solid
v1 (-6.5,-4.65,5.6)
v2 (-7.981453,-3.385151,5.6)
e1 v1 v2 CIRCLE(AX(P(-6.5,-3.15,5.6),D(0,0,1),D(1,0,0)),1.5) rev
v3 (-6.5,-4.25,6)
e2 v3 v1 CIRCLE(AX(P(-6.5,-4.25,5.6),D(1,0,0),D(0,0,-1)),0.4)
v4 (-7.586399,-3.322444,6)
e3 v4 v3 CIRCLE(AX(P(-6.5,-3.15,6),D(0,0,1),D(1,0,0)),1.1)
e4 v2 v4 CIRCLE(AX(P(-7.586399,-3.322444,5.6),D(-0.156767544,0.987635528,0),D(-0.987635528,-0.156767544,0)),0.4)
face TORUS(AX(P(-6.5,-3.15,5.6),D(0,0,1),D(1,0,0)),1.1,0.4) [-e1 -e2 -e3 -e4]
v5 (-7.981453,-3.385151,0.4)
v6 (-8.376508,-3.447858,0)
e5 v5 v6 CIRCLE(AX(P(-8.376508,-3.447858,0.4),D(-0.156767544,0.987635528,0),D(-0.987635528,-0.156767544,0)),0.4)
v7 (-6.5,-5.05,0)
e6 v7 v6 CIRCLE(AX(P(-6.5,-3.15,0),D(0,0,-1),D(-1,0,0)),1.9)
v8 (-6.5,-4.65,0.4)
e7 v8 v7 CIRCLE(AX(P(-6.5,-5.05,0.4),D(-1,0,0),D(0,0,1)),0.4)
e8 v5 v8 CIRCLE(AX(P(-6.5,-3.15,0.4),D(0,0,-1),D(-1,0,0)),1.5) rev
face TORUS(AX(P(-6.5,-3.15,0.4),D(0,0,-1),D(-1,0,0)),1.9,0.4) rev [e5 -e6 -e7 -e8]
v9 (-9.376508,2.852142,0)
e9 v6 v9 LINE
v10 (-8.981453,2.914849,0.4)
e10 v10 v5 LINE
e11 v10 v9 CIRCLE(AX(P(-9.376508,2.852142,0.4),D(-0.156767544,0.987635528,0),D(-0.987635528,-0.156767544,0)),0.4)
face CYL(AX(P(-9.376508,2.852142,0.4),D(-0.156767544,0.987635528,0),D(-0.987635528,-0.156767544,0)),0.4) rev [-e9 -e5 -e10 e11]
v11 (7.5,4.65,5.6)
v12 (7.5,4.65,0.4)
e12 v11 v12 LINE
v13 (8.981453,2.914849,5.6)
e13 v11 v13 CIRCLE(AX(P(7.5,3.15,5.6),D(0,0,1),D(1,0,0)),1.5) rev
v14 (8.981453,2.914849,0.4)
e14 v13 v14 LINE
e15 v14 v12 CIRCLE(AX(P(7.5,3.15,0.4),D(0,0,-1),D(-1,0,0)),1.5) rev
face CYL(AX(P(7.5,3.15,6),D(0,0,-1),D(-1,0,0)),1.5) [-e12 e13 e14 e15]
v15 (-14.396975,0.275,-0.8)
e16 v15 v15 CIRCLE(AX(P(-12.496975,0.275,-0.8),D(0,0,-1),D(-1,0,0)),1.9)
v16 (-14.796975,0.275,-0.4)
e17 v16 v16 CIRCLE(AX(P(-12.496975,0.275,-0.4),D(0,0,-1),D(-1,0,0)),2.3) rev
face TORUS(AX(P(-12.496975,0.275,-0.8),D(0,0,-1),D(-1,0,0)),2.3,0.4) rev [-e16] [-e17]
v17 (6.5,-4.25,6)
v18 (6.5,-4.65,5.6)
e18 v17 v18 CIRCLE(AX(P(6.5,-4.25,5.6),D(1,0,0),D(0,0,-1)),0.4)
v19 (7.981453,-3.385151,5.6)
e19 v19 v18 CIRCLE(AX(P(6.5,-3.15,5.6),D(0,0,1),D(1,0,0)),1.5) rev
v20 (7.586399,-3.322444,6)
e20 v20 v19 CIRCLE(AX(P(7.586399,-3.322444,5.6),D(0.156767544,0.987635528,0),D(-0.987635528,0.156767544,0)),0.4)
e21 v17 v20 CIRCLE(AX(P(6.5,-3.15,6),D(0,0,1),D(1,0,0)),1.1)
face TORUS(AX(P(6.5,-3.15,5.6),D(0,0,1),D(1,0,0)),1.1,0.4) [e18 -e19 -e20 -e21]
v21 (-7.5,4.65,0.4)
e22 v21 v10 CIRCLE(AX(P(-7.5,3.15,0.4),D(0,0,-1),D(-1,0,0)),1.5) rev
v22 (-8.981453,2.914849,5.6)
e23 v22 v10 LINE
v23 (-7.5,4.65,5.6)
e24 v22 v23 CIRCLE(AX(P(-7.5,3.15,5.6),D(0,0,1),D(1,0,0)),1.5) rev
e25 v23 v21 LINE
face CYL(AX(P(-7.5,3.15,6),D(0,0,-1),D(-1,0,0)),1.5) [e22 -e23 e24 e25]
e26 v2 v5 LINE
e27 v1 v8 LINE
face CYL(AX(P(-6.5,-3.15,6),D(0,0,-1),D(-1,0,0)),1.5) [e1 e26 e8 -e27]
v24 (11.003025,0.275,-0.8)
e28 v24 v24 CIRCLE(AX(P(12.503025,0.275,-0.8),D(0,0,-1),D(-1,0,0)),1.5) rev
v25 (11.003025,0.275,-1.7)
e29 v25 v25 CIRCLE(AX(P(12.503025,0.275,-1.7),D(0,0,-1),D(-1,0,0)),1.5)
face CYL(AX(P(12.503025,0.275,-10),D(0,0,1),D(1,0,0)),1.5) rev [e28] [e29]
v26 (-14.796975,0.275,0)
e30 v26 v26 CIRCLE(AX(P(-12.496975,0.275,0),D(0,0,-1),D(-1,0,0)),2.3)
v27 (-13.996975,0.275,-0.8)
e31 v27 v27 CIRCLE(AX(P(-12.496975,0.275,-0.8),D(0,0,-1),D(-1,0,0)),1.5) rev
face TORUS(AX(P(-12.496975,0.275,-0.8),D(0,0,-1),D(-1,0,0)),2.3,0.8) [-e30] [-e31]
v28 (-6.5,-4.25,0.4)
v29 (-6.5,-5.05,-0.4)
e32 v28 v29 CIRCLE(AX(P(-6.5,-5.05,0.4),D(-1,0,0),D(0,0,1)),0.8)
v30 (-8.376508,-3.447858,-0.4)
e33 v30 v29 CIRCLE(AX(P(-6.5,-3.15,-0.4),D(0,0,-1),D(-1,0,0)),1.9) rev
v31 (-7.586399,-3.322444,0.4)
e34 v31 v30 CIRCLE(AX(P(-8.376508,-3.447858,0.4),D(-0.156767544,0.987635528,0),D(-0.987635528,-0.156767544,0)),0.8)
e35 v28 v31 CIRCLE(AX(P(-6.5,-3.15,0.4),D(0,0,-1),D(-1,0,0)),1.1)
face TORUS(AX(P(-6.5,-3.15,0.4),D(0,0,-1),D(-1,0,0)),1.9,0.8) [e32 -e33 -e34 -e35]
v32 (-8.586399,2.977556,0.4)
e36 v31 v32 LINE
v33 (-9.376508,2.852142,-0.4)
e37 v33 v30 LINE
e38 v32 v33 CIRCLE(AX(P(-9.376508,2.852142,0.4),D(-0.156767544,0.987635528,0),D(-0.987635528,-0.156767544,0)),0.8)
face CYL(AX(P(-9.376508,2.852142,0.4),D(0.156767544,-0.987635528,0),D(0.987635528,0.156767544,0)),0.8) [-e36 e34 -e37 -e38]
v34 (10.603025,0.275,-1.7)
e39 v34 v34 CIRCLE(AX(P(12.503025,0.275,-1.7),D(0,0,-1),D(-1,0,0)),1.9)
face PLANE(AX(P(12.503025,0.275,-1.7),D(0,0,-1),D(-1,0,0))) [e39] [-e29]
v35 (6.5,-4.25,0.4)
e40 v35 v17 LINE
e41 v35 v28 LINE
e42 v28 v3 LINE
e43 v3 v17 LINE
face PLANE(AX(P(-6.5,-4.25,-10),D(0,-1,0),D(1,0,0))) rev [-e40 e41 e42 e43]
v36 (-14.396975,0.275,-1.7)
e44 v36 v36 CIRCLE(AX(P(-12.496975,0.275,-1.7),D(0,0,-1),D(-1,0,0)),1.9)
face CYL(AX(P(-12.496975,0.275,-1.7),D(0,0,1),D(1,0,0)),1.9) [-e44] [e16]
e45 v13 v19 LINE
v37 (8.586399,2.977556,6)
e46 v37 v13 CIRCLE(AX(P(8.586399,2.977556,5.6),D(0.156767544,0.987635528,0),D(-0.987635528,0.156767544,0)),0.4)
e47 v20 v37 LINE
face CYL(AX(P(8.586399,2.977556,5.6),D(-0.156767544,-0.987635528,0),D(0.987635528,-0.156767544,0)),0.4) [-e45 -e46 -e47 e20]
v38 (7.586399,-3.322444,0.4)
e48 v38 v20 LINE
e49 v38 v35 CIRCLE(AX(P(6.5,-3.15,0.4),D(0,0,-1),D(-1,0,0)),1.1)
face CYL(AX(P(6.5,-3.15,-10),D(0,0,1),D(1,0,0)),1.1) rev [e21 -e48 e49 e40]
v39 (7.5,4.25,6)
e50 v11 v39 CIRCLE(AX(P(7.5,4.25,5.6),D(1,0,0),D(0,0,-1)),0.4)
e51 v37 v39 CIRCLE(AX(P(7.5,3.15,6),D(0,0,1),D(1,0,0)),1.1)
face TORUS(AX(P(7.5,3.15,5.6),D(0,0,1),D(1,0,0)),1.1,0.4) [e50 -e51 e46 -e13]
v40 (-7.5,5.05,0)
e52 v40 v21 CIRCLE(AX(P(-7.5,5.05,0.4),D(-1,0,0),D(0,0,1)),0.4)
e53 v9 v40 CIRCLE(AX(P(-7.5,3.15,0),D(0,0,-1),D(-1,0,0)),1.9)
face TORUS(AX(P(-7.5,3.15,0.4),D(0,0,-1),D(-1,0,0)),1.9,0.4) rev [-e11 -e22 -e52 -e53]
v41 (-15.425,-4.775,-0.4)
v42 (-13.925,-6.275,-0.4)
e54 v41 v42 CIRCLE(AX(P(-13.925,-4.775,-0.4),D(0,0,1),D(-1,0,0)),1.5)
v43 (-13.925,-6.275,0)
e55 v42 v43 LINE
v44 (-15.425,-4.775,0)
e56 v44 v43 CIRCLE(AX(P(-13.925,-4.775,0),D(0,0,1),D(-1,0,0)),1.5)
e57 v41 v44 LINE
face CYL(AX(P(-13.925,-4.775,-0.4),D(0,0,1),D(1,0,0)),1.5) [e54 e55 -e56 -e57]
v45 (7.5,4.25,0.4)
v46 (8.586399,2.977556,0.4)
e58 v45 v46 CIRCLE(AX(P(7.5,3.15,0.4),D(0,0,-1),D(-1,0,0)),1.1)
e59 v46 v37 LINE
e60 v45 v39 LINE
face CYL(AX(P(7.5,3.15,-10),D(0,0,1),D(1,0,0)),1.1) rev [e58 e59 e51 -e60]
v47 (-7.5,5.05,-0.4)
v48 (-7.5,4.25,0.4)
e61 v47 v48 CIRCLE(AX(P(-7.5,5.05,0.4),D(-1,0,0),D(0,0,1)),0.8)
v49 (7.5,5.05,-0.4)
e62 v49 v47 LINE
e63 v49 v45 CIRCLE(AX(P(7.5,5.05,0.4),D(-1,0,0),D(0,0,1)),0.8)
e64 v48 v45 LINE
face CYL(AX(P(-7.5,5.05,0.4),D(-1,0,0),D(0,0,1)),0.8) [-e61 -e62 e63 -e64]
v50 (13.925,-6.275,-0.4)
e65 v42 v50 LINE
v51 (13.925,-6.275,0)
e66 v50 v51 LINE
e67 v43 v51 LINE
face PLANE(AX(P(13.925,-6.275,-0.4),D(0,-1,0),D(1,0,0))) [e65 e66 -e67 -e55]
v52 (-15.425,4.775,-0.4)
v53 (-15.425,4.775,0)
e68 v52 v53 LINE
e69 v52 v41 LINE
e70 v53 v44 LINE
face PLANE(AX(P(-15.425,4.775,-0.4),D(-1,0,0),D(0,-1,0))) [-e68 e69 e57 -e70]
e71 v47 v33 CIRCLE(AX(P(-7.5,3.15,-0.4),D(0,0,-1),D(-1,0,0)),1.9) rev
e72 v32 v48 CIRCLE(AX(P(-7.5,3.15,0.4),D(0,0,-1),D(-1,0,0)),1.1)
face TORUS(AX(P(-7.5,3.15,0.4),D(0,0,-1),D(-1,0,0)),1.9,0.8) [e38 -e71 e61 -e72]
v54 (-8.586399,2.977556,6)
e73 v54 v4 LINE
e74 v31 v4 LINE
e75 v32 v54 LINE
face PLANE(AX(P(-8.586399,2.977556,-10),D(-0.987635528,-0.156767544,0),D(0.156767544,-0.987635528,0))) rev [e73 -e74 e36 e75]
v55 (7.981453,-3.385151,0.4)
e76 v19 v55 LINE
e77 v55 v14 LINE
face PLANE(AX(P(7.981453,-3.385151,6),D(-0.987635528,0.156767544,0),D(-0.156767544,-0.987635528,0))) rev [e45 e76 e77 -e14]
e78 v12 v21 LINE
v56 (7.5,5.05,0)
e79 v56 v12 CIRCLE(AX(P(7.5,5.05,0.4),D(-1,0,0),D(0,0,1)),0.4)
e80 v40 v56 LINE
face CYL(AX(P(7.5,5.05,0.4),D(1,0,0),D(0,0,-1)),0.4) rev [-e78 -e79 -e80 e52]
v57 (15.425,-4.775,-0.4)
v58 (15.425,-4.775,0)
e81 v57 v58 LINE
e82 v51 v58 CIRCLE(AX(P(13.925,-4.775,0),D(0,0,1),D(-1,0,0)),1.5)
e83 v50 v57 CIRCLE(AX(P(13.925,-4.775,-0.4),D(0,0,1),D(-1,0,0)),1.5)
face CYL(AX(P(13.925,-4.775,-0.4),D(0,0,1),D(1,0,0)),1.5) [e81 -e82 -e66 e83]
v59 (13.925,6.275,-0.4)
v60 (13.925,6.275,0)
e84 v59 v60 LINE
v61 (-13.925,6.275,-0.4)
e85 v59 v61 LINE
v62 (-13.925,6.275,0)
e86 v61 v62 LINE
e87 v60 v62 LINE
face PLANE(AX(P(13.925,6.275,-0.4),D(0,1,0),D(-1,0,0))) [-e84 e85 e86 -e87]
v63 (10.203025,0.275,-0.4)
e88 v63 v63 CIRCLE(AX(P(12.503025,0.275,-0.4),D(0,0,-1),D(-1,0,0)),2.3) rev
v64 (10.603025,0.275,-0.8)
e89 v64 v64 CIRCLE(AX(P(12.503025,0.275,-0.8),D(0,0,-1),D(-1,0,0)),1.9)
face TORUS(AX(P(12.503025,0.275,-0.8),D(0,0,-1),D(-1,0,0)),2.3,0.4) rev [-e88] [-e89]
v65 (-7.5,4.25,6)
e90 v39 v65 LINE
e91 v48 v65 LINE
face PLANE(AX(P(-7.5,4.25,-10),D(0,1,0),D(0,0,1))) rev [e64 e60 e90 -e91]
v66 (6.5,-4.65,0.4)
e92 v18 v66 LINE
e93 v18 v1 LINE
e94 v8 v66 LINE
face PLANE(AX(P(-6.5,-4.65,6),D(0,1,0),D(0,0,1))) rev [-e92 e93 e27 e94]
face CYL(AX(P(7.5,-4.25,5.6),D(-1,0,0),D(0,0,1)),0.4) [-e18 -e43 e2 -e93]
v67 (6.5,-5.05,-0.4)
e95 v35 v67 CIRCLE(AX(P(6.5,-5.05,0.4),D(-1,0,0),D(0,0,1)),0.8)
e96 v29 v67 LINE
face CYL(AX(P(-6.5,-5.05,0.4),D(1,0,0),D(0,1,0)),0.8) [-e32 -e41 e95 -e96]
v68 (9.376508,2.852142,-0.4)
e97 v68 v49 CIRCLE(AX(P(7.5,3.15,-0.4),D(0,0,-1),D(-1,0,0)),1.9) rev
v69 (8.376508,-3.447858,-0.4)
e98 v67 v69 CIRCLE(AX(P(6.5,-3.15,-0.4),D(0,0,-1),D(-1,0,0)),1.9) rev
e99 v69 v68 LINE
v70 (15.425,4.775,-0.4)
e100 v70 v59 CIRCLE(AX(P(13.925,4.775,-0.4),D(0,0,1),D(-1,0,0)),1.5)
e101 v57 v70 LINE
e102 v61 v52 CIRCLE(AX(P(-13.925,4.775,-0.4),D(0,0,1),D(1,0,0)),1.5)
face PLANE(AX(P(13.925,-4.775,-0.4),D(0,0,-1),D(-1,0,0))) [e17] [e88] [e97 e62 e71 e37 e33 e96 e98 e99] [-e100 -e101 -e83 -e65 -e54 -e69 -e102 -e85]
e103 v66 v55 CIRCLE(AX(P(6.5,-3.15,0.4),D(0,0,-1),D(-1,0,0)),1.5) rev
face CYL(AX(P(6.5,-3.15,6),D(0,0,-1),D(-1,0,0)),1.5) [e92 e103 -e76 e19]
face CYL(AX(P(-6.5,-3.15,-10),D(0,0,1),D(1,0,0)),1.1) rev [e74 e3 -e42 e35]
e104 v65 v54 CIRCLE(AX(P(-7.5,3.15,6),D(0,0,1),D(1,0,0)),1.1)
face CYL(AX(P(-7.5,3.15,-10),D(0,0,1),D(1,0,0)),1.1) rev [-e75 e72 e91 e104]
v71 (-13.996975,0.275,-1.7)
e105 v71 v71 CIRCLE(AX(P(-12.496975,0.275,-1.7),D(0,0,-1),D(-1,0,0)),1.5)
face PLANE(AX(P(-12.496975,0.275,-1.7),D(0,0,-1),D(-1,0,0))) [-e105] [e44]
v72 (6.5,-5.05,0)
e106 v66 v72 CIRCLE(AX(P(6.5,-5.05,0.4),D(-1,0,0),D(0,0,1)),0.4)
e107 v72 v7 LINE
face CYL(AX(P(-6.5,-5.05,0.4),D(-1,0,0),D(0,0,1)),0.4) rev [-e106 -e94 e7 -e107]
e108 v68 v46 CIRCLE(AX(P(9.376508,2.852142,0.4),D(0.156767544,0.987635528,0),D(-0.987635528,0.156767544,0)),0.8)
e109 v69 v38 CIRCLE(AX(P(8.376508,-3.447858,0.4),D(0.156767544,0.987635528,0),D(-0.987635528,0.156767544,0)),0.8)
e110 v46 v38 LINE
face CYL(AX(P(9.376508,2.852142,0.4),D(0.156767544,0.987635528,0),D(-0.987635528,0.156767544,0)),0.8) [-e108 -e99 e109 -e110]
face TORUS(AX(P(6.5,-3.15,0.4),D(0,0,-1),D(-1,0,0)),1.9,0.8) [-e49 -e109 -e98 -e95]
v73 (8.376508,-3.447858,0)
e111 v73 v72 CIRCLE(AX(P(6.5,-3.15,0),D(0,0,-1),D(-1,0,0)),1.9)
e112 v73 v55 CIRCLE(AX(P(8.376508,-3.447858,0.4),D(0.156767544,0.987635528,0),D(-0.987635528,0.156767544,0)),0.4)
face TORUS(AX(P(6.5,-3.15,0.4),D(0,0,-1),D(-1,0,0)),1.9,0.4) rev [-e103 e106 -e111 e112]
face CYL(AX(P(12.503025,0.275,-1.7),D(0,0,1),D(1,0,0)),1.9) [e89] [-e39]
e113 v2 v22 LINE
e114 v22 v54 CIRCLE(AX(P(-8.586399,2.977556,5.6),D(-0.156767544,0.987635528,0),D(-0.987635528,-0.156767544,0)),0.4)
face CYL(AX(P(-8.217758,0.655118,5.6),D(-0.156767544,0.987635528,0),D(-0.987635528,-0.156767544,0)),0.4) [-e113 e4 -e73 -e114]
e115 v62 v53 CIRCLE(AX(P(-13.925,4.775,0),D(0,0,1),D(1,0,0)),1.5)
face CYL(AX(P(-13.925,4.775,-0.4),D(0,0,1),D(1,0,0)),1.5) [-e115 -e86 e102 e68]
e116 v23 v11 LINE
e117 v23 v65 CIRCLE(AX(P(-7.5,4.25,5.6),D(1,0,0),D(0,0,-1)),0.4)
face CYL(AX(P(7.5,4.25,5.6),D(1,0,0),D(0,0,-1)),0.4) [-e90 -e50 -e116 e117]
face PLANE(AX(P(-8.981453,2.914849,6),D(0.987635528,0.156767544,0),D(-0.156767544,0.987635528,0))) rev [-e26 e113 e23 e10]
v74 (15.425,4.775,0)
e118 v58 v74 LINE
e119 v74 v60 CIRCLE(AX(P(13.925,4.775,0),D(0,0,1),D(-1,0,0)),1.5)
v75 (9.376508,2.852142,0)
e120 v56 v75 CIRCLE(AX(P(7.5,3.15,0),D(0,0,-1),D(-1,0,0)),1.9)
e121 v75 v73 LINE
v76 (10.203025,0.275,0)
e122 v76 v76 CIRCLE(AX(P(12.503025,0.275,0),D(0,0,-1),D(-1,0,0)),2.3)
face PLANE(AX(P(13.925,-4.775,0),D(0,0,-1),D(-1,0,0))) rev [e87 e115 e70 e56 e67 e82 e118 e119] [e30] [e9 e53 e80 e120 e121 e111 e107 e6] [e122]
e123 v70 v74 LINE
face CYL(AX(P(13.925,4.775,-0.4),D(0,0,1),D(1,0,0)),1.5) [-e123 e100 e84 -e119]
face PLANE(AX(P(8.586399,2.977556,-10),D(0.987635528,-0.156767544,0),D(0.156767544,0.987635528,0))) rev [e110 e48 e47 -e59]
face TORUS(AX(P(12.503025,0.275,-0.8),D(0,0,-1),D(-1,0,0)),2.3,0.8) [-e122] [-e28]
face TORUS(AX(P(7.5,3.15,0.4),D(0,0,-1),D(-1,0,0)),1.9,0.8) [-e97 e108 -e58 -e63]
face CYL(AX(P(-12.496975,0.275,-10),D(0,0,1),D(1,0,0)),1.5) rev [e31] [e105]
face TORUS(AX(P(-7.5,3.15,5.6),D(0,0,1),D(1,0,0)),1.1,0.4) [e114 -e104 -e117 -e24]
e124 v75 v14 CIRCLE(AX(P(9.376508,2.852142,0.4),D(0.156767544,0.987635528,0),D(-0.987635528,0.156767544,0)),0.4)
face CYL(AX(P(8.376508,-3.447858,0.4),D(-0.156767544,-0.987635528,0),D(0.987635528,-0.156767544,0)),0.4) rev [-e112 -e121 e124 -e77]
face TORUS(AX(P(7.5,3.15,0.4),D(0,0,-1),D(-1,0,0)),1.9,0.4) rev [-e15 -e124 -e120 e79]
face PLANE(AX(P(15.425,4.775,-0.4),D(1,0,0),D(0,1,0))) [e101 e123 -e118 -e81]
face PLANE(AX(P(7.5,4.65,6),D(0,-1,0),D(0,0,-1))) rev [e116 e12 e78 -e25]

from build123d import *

# Parameters (mm, degrees)
BASE_FLANGE1_DEPTH  = 0.4
SKETCH6_R           = 1.5
CUT_EXTRUDE1_DEPTH  = 10
CUT_EXTRUDE2_DEPTH  = 10
BOSS_EXTRUDE1_START = 6
BOSS_EXTRUDE1_DEPTH = 6
FILLET1_R           = 0.4
FILLET2_R           = 0.8
SKETCH10_R          = 1.9
SKETCH10_R_2        = 1.5
BOSS_EXTRUDE2_DEPTH = 1.3
FILLET3_R           = 0.4
FILLET4_R           = 0.8
FILLET5_R           = 0.4


# Sheet-metal steps are written as plain solids
with BuildPart() as part:
    # Sketch1 → Base-Flange1 (new body)
    with BuildSketch(Plane.XY):
        with BuildLine():
            Line((13.925, 6.275), (-13.925, 6.275))
            ThreePointArc((-13.925, 6.275), (-14.985660172, 5.835660172), (-15.425, 4.775))
            Line((-15.425, 4.775), (-15.425, -4.775))
            ThreePointArc((-15.425, -4.775), (-14.985660172, -5.835660172), (-13.925, -6.275))
            Line((-13.925, -6.275), (13.925, -6.275))
            ThreePointArc((13.925, -6.275), (14.985660172, -5.835660172), (15.425, -4.775))
            Line((15.425, -4.775), (15.425, 4.775))
            ThreePointArc((15.425, 4.775), (14.985660172, 5.835660172), (13.925, 6.275))
        make_face()
    extrude(amount=-BASE_FLANGE1_DEPTH)

    # Sketch6 → Cut-Extrude1 (cut)
    with BuildSketch(Plane.XY):
        with Locations((-12.496974634, 0.275)):
            Circle(SKETCH6_R)
        with Locations((12.503025366, 0.275)):
            Circle(SKETCH6_R)
    extrude(amount=-CUT_EXTRUDE1_DEPTH, mode=Mode.SUBTRACT)

    # Sketch7 → Cut-Extrude2 (cut)
    with BuildSketch(Plane.XY):
        with BuildLine():
            Line((8.586399081, 2.977555701), (7.586399081, -3.322444299))
            ThreePointArc((7.586399081, -3.322444299), (7.214251801, -3.986567011), (6.5, -4.25))
            Line((6.5, -4.25), (-6.5, -4.25))
            ThreePointArc((-6.5, -4.25), (-7.214251801, -3.986567011), (-7.586399081, -3.322444299))
            Line((-7.586399081, -3.322444299), (-8.586399081, 2.977555701))
            ThreePointArc((-8.586399081, 2.977555701), (-8.336567011, 3.864251801), (-7.5, 4.25))
            Line((-7.5, 4.25), (7.5, 4.25))
            ThreePointArc((7.5, 4.25), (8.336567011, 3.864251801), (8.586399081, 2.977555701))
        make_face()
    extrude(amount=-CUT_EXTRUDE2_DEPTH, mode=Mode.SUBTRACT)

    # Sketch8 → Boss-Extrude1 (add)
    with BuildSketch(Plane.XY.offset(BOSS_EXTRUDE1_START)):
        with BuildLine():
            Line((7.5, 4.65), (-7.5, 4.65))
            ThreePointArc((-7.5, 4.65), (-8.640773197, 4.123979729), (-8.981453293, 2.914848684))
            Line((-8.981453293, 2.914848684), (-7.981453293, -3.385151316))
            ThreePointArc((-7.981453293, -3.385151316), (-7.473979729, -4.290773197), (-6.5, -4.65))
            Line((-6.5, -4.65), (6.5, -4.65))
            ThreePointArc((6.5, -4.65), (7.473979729, -4.290773197), (7.981453293, -3.385151316))
            Line((7.981453293, -3.385151316), (8.981453293, 2.914848684))
            ThreePointArc((8.981453293, 2.914848684), (8.640773197, 4.123979729), (7.5, 4.65))
        make_face()
        with BuildLine():
            Line((7.586399081, -3.322444299), (8.586399081, 2.977555701))
            ThreePointArc((8.586399081, 2.977555701), (8.336567011, 3.864251801), (7.5, 4.25))
            Line((7.5, 4.25), (-7.5, 4.25))
            ThreePointArc((-7.5, 4.25), (-8.336567011, 3.864251801), (-8.586399081, 2.977555701))
            Line((-8.586399081, 2.977555701), (-7.586399081, -3.322444299))
            ThreePointArc((-7.586399081, -3.322444299), (-7.214251801, -3.986567011), (-6.5, -4.25))
            Line((-6.5, -4.25), (6.5, -4.25))
            ThreePointArc((6.5, -4.25), (7.214251801, -3.986567011), (7.586399081, -3.322444299))
        make_face(mode=Mode.SUBTRACT)
    extrude(amount=-BOSS_EXTRUDE1_DEPTH)

    # Fillet1
    fillet1_edges = [part.edges().sort_by_distance(p)[0] for p in [
        (-7.473979729, -4.290773197, 0),
        (0, -4.65, 0),
        (7.473979729, -4.290773197, 0),
        (8.481453293, -0.235151316, 0),
        (8.640773197, 4.123979729, 0),
        (0, 4.65, 0),
        (-8.640773197, 4.123979729, 0),
        (-8.481453293, -0.235151316, 0),
    ]]
    fillet(fillet1_edges, radius=FILLET1_R)

    # Fillet2
    fillet2_edges = [part.edges().sort_by_distance(p)[0] for p in [
        (8.336567011, 3.864251801, -0.4),
        (8.086399081, -0.172444299, -0.4),
        (7.214251801, -3.986567011, -0.4),
        (0, -4.25, -0.4),
        (-7.214251801, -3.986567011, -0.4),
        (-8.086399081, -0.172444299, -0.4),
        (-8.336567011, 3.864251801, -0.4),
        (0, 4.25, -0.4),
    ]]
    fillet(fillet2_edges, radius=FILLET2_R)

    # Sketch10 → Boss-Extrude2 (add)
    # profile 1 of 2: a face of its own
    with BuildSketch(Plane(origin=(0, 0, -0.4), x_dir=(-1, 0, 0), z_dir=(0, 0, -1))):
        with Locations((-12.503025366, 0.275)):
            Circle(SKETCH10_R)
        with Locations(Location((-12.503025366, 0.275, 0), (0, 0, 180))):
            Circle(SKETCH10_R_2, mode=Mode.SUBTRACT)
    # profile 2 of 2: a face of its own
    with BuildSketch(Plane(origin=(0, 0, -0.4), x_dir=(-1, 0, 0), z_dir=(0, 0, -1))):
        with Locations((12.496974634, 0.275)):
            Circle(SKETCH10_R)
        with Locations(Location((12.496974634, 0.275, 0), (0, 0, 180))):
            Circle(SKETCH10_R_2, mode=Mode.SUBTRACT)
    extrude(amount=BOSS_EXTRUDE2_DEPTH)

    # Fillet3
    fillet3_edges = [part.edges().sort_by_distance(p)[0] for p in [
        (14.403025366, 0.275, -0.4),
        (-10.596974634, 0.275, -0.4),
    ]]
    fillet(fillet3_edges, radius=FILLET3_R)

    # Fillet4
    fillet4_edges = [part.edges().sort_by_distance(p)[0] for p in [
        (-13.996974634, 0.275, 0),
        (11.003025366, 0.275, 0),
    ]]
    fillet(fillet4_edges, radius=FILLET4_R)

    # Fillet5
    fillet5_edges = [part.edges().sort_by_distance(p)[0] for p in [
        (8.640773197, 4.123979729, 6),
        (0, 4.65, 6),
        (-8.640773197, 4.123979729, 6),
        (-8.481453293, -0.235151316, 6),
        (-7.473979729, -4.290773197, 6),
        (0, -4.65, 6),
        (7.473979729, -4.290773197, 6),
        (8.481453293, -0.235151316, 6),
    ]]
    fillet(fillet5_edges, radius=FILLET5_R - 0.0001)  # a hair under: the kernel refuses the full size


solid = part.part
